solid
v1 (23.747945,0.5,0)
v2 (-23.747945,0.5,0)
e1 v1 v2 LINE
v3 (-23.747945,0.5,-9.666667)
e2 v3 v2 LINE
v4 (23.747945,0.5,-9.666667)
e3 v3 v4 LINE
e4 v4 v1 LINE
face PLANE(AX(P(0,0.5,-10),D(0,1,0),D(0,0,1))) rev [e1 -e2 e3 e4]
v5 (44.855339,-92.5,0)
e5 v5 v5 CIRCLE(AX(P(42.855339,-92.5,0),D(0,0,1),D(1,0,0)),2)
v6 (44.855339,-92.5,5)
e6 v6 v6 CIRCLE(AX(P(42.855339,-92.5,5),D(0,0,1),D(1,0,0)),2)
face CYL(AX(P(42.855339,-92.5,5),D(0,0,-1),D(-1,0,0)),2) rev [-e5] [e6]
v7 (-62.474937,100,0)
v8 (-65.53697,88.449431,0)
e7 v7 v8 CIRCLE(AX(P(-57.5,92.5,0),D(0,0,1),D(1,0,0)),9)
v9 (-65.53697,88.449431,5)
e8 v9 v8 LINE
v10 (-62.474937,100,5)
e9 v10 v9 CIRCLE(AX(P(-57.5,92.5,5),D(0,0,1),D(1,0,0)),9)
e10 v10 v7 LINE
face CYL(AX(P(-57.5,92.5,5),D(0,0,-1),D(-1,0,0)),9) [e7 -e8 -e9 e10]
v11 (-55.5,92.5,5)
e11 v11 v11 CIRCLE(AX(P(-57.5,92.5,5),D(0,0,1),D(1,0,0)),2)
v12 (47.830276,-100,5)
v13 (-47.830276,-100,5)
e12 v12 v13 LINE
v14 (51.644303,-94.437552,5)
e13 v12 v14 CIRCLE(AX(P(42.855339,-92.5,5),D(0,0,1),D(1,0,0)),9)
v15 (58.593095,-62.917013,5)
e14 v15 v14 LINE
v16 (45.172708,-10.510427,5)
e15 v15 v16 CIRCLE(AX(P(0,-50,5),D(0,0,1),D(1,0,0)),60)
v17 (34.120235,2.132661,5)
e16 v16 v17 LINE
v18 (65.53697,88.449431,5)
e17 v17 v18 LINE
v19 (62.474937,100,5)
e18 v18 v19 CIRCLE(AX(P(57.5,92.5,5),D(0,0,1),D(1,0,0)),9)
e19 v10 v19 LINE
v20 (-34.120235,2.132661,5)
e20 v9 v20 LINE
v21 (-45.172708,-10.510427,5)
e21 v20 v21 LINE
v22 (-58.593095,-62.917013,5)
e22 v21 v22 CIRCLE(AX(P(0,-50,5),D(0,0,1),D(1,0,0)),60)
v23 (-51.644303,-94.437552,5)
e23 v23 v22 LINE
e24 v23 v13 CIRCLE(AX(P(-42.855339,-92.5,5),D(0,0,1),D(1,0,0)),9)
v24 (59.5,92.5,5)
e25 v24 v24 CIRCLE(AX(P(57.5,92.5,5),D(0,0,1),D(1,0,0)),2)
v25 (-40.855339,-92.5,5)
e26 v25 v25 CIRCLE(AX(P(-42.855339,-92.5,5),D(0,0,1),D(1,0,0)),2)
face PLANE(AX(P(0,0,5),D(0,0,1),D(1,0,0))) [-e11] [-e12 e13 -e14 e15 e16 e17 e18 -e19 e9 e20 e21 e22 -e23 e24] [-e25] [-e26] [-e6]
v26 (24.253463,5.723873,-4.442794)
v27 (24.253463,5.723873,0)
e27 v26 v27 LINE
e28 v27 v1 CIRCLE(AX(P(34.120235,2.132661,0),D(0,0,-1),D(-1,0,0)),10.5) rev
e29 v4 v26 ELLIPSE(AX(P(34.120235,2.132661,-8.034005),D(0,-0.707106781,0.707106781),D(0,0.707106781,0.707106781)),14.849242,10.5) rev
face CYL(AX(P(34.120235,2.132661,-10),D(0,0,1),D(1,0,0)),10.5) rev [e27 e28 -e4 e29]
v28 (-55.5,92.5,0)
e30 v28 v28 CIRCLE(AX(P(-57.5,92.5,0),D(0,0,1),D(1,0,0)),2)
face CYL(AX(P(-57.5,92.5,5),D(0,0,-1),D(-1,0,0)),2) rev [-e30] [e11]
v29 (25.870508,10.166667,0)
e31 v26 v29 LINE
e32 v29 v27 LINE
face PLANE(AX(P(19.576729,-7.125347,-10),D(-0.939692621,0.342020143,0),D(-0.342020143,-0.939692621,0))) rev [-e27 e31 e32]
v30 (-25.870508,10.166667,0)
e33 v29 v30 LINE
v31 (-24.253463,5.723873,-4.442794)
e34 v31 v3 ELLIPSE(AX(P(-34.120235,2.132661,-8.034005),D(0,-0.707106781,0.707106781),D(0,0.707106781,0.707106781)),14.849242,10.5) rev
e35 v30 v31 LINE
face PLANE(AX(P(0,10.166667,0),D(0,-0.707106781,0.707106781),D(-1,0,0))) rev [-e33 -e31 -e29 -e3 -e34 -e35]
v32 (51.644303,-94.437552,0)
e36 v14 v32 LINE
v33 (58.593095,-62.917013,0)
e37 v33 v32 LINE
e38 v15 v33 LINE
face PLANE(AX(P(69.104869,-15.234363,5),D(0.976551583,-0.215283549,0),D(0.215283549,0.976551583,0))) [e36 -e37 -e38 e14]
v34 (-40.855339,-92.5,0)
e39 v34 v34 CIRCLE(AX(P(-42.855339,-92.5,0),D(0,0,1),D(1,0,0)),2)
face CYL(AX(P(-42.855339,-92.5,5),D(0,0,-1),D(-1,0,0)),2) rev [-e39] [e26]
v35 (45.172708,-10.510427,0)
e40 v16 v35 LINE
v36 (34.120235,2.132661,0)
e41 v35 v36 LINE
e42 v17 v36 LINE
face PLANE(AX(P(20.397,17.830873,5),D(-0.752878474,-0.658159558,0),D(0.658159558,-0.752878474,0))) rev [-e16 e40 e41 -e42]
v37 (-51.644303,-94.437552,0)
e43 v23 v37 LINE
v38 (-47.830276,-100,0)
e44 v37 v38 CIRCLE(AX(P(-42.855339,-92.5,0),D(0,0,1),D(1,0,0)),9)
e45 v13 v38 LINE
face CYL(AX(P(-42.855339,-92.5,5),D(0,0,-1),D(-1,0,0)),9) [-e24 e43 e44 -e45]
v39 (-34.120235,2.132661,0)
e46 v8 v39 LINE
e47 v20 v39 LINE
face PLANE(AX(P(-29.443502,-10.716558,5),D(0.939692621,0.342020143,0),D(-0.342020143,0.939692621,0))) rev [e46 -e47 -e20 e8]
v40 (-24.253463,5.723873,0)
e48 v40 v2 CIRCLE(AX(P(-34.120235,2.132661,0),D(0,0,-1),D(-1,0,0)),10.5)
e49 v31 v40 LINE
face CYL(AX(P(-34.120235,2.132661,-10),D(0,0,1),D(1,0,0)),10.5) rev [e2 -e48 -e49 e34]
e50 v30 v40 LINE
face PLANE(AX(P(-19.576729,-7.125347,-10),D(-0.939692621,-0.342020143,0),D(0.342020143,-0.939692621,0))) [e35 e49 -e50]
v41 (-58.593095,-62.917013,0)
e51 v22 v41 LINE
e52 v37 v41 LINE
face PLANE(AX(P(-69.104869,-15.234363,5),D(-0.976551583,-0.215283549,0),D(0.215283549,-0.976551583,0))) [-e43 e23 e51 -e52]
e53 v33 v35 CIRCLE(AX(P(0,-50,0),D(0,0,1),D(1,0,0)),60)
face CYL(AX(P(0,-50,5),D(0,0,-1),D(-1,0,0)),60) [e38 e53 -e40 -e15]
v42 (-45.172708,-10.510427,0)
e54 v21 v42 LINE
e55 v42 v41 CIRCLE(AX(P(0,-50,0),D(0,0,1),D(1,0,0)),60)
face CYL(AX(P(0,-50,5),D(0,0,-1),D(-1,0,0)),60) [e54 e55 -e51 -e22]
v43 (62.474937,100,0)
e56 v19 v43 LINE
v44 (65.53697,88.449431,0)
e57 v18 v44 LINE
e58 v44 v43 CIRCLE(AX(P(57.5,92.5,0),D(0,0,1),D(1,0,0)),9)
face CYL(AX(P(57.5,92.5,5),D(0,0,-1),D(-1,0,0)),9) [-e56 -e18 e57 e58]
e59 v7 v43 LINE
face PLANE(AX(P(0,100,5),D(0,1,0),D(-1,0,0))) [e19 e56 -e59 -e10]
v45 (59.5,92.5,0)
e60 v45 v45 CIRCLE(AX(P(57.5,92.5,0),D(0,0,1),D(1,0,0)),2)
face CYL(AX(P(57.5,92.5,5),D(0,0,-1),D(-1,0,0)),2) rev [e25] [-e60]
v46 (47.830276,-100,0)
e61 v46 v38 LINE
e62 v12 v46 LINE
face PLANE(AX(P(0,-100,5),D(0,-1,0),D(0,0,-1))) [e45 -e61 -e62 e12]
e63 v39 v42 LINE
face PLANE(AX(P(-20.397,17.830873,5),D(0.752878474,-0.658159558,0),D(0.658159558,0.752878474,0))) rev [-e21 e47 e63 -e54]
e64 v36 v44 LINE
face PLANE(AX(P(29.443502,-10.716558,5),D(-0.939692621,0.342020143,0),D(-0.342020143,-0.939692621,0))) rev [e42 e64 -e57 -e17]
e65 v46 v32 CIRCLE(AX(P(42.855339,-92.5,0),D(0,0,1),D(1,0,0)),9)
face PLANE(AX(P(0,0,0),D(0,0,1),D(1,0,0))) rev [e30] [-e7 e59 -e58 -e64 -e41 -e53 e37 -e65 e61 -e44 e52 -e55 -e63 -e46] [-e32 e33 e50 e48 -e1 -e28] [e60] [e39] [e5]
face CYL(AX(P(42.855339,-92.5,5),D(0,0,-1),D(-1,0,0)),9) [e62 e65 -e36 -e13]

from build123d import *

# Parameters (mm, degrees)
SKETCH1_R           = 2
BOSS_EXTRUDE1_DEPTH = 5
BOSS_EXTRUDE2_DEPTH = 10
CHAMFER2_SIZE       = 10


with BuildPart() as part:
    # Sketch1 → Boss-Extrude1 (new body)
    with BuildSketch(Plane.XY):
        with BuildLine():
            ThreePointArc((58.593094964, -62.917012913), (58.124418815, -35.115379165), (45.172708428, -10.510426525))
            Line((45.172708428, -10.510426525), (34.120235365, 2.132661237))
            Line((34.120235365, 2.132661237), (65.536970349, 88.4494312))
            ThreePointArc((65.536970349, 88.4494312), (66.199502533, 94.806221081), (62.474937186, 100))
            Line((62.474937186, 100), (55, 100))
            Line((55, 100), (-55, 100))
            Line((-55, 100), (-62.474937186, 100))
            ThreePointArc((-62.474937186, 100), (-66.199502533, 94.806221081), (-65.536970349, 88.4494312))
            Line((-65.536970349, 88.4494312), (-34.120235365, 2.132661237))
            Line((-34.120235365, 2.132661237), (-45.172708428, -10.510426525))
            ThreePointArc((-45.172708428, -10.510426525), (-58.124418815, -35.115379165), (-58.593094964, -62.917012913))
            Line((-58.593094964, -62.917012913), (-51.644303304, -94.437551937))
            ThreePointArc((-51.644303304, -94.437551937), (-50.278037542, -97.589552755), (-47.830276245, -100))
            Line((-47.830276245, -100), (-40.355339059, -100))
            Line((-40.355339059, -100), (40.355339059, -100))
            Line((40.355339059, -100), (47.830276245, -100))
            ThreePointArc((47.830276245, -100), (50.278037542, -97.589552755), (51.644303304, -94.437551937))
            Line((51.644303304, -94.437551937), (58.593094964, -62.917012913))
        make_face()
        with Locations((-42.855339059, -92.5)):
            Circle(SKETCH1_R, mode=Mode.SUBTRACT)
        with Locations((42.855339059, -92.5)):
            Circle(SKETCH1_R, mode=Mode.SUBTRACT)
        with Locations((-57.5, 92.5)):
            Circle(SKETCH1_R, mode=Mode.SUBTRACT)
        with Locations((57.5, 92.5)):
            Circle(SKETCH1_R, mode=Mode.SUBTRACT)
    extrude(amount=BOSS_EXTRUDE1_DEPTH)

    # Sketch2 → Boss-Extrude2 (add)
    with BuildSketch(Plane(origin=(0, 0, 0), x_dir=(-1, 0, 0), z_dir=(0, 0, -1))):
        with BuildLine():
            Line((-25.870507592, 10.166666667), (-24.253462846, 5.723872742))
            ThreePointArc((-24.253462846, 5.723872742), (-23.669056818, 3.144030102), (-23.747944524, 0.5))
            Line((-23.747944524, 0.5), (23.747944524, 0.5))
            ThreePointArc((23.747944524, 0.5), (23.669056818, 3.144030102), (24.253462846, 5.723872742))
            Line((24.253462846, 5.723872742), (25.870507592, 10.166666667))
            Line((25.870507592, 10.166666667), (-25.870507592, 10.166666667))
        make_face()
    extrude(amount=BOSS_EXTRUDE2_DEPTH)

    # Chamfer2
    # the kernel refuses this chamfer: 10 mm, written as the material it takes off along each edge
    with BuildSketch(Plane(origin=(-51.587337472, 10.166666667, -10), x_dir=(0, 0.027495876610586317, 0.9996219169112968), z_dir=(1, 0, 0))) as chamfer2_piece_1_section:
        Polygon((CHAMFER2_SIZE * 0.999621916911, CHAMFER2_SIZE * 0.0274958766106), (-CHAMFER2_SIZE * 0.0274958766106, CHAMFER2_SIZE * 0.999621916911), (0, 0), align=None)
    chamfer2_piece_1 = extrude(amount=103.174674944, mode=Mode.PRIVATE)
    chamfer2_piece_1 = split(chamfer2_piece_1, bisect_by=Plane(origin=(0, 6.862625123, 0), z_dir=(0, 0, -1)), keep=Keep.TOP, mode=Mode.PRIVATE)
    add(chamfer2_piece_1, mode=Mode.SUBTRACT)


solid = part.part
